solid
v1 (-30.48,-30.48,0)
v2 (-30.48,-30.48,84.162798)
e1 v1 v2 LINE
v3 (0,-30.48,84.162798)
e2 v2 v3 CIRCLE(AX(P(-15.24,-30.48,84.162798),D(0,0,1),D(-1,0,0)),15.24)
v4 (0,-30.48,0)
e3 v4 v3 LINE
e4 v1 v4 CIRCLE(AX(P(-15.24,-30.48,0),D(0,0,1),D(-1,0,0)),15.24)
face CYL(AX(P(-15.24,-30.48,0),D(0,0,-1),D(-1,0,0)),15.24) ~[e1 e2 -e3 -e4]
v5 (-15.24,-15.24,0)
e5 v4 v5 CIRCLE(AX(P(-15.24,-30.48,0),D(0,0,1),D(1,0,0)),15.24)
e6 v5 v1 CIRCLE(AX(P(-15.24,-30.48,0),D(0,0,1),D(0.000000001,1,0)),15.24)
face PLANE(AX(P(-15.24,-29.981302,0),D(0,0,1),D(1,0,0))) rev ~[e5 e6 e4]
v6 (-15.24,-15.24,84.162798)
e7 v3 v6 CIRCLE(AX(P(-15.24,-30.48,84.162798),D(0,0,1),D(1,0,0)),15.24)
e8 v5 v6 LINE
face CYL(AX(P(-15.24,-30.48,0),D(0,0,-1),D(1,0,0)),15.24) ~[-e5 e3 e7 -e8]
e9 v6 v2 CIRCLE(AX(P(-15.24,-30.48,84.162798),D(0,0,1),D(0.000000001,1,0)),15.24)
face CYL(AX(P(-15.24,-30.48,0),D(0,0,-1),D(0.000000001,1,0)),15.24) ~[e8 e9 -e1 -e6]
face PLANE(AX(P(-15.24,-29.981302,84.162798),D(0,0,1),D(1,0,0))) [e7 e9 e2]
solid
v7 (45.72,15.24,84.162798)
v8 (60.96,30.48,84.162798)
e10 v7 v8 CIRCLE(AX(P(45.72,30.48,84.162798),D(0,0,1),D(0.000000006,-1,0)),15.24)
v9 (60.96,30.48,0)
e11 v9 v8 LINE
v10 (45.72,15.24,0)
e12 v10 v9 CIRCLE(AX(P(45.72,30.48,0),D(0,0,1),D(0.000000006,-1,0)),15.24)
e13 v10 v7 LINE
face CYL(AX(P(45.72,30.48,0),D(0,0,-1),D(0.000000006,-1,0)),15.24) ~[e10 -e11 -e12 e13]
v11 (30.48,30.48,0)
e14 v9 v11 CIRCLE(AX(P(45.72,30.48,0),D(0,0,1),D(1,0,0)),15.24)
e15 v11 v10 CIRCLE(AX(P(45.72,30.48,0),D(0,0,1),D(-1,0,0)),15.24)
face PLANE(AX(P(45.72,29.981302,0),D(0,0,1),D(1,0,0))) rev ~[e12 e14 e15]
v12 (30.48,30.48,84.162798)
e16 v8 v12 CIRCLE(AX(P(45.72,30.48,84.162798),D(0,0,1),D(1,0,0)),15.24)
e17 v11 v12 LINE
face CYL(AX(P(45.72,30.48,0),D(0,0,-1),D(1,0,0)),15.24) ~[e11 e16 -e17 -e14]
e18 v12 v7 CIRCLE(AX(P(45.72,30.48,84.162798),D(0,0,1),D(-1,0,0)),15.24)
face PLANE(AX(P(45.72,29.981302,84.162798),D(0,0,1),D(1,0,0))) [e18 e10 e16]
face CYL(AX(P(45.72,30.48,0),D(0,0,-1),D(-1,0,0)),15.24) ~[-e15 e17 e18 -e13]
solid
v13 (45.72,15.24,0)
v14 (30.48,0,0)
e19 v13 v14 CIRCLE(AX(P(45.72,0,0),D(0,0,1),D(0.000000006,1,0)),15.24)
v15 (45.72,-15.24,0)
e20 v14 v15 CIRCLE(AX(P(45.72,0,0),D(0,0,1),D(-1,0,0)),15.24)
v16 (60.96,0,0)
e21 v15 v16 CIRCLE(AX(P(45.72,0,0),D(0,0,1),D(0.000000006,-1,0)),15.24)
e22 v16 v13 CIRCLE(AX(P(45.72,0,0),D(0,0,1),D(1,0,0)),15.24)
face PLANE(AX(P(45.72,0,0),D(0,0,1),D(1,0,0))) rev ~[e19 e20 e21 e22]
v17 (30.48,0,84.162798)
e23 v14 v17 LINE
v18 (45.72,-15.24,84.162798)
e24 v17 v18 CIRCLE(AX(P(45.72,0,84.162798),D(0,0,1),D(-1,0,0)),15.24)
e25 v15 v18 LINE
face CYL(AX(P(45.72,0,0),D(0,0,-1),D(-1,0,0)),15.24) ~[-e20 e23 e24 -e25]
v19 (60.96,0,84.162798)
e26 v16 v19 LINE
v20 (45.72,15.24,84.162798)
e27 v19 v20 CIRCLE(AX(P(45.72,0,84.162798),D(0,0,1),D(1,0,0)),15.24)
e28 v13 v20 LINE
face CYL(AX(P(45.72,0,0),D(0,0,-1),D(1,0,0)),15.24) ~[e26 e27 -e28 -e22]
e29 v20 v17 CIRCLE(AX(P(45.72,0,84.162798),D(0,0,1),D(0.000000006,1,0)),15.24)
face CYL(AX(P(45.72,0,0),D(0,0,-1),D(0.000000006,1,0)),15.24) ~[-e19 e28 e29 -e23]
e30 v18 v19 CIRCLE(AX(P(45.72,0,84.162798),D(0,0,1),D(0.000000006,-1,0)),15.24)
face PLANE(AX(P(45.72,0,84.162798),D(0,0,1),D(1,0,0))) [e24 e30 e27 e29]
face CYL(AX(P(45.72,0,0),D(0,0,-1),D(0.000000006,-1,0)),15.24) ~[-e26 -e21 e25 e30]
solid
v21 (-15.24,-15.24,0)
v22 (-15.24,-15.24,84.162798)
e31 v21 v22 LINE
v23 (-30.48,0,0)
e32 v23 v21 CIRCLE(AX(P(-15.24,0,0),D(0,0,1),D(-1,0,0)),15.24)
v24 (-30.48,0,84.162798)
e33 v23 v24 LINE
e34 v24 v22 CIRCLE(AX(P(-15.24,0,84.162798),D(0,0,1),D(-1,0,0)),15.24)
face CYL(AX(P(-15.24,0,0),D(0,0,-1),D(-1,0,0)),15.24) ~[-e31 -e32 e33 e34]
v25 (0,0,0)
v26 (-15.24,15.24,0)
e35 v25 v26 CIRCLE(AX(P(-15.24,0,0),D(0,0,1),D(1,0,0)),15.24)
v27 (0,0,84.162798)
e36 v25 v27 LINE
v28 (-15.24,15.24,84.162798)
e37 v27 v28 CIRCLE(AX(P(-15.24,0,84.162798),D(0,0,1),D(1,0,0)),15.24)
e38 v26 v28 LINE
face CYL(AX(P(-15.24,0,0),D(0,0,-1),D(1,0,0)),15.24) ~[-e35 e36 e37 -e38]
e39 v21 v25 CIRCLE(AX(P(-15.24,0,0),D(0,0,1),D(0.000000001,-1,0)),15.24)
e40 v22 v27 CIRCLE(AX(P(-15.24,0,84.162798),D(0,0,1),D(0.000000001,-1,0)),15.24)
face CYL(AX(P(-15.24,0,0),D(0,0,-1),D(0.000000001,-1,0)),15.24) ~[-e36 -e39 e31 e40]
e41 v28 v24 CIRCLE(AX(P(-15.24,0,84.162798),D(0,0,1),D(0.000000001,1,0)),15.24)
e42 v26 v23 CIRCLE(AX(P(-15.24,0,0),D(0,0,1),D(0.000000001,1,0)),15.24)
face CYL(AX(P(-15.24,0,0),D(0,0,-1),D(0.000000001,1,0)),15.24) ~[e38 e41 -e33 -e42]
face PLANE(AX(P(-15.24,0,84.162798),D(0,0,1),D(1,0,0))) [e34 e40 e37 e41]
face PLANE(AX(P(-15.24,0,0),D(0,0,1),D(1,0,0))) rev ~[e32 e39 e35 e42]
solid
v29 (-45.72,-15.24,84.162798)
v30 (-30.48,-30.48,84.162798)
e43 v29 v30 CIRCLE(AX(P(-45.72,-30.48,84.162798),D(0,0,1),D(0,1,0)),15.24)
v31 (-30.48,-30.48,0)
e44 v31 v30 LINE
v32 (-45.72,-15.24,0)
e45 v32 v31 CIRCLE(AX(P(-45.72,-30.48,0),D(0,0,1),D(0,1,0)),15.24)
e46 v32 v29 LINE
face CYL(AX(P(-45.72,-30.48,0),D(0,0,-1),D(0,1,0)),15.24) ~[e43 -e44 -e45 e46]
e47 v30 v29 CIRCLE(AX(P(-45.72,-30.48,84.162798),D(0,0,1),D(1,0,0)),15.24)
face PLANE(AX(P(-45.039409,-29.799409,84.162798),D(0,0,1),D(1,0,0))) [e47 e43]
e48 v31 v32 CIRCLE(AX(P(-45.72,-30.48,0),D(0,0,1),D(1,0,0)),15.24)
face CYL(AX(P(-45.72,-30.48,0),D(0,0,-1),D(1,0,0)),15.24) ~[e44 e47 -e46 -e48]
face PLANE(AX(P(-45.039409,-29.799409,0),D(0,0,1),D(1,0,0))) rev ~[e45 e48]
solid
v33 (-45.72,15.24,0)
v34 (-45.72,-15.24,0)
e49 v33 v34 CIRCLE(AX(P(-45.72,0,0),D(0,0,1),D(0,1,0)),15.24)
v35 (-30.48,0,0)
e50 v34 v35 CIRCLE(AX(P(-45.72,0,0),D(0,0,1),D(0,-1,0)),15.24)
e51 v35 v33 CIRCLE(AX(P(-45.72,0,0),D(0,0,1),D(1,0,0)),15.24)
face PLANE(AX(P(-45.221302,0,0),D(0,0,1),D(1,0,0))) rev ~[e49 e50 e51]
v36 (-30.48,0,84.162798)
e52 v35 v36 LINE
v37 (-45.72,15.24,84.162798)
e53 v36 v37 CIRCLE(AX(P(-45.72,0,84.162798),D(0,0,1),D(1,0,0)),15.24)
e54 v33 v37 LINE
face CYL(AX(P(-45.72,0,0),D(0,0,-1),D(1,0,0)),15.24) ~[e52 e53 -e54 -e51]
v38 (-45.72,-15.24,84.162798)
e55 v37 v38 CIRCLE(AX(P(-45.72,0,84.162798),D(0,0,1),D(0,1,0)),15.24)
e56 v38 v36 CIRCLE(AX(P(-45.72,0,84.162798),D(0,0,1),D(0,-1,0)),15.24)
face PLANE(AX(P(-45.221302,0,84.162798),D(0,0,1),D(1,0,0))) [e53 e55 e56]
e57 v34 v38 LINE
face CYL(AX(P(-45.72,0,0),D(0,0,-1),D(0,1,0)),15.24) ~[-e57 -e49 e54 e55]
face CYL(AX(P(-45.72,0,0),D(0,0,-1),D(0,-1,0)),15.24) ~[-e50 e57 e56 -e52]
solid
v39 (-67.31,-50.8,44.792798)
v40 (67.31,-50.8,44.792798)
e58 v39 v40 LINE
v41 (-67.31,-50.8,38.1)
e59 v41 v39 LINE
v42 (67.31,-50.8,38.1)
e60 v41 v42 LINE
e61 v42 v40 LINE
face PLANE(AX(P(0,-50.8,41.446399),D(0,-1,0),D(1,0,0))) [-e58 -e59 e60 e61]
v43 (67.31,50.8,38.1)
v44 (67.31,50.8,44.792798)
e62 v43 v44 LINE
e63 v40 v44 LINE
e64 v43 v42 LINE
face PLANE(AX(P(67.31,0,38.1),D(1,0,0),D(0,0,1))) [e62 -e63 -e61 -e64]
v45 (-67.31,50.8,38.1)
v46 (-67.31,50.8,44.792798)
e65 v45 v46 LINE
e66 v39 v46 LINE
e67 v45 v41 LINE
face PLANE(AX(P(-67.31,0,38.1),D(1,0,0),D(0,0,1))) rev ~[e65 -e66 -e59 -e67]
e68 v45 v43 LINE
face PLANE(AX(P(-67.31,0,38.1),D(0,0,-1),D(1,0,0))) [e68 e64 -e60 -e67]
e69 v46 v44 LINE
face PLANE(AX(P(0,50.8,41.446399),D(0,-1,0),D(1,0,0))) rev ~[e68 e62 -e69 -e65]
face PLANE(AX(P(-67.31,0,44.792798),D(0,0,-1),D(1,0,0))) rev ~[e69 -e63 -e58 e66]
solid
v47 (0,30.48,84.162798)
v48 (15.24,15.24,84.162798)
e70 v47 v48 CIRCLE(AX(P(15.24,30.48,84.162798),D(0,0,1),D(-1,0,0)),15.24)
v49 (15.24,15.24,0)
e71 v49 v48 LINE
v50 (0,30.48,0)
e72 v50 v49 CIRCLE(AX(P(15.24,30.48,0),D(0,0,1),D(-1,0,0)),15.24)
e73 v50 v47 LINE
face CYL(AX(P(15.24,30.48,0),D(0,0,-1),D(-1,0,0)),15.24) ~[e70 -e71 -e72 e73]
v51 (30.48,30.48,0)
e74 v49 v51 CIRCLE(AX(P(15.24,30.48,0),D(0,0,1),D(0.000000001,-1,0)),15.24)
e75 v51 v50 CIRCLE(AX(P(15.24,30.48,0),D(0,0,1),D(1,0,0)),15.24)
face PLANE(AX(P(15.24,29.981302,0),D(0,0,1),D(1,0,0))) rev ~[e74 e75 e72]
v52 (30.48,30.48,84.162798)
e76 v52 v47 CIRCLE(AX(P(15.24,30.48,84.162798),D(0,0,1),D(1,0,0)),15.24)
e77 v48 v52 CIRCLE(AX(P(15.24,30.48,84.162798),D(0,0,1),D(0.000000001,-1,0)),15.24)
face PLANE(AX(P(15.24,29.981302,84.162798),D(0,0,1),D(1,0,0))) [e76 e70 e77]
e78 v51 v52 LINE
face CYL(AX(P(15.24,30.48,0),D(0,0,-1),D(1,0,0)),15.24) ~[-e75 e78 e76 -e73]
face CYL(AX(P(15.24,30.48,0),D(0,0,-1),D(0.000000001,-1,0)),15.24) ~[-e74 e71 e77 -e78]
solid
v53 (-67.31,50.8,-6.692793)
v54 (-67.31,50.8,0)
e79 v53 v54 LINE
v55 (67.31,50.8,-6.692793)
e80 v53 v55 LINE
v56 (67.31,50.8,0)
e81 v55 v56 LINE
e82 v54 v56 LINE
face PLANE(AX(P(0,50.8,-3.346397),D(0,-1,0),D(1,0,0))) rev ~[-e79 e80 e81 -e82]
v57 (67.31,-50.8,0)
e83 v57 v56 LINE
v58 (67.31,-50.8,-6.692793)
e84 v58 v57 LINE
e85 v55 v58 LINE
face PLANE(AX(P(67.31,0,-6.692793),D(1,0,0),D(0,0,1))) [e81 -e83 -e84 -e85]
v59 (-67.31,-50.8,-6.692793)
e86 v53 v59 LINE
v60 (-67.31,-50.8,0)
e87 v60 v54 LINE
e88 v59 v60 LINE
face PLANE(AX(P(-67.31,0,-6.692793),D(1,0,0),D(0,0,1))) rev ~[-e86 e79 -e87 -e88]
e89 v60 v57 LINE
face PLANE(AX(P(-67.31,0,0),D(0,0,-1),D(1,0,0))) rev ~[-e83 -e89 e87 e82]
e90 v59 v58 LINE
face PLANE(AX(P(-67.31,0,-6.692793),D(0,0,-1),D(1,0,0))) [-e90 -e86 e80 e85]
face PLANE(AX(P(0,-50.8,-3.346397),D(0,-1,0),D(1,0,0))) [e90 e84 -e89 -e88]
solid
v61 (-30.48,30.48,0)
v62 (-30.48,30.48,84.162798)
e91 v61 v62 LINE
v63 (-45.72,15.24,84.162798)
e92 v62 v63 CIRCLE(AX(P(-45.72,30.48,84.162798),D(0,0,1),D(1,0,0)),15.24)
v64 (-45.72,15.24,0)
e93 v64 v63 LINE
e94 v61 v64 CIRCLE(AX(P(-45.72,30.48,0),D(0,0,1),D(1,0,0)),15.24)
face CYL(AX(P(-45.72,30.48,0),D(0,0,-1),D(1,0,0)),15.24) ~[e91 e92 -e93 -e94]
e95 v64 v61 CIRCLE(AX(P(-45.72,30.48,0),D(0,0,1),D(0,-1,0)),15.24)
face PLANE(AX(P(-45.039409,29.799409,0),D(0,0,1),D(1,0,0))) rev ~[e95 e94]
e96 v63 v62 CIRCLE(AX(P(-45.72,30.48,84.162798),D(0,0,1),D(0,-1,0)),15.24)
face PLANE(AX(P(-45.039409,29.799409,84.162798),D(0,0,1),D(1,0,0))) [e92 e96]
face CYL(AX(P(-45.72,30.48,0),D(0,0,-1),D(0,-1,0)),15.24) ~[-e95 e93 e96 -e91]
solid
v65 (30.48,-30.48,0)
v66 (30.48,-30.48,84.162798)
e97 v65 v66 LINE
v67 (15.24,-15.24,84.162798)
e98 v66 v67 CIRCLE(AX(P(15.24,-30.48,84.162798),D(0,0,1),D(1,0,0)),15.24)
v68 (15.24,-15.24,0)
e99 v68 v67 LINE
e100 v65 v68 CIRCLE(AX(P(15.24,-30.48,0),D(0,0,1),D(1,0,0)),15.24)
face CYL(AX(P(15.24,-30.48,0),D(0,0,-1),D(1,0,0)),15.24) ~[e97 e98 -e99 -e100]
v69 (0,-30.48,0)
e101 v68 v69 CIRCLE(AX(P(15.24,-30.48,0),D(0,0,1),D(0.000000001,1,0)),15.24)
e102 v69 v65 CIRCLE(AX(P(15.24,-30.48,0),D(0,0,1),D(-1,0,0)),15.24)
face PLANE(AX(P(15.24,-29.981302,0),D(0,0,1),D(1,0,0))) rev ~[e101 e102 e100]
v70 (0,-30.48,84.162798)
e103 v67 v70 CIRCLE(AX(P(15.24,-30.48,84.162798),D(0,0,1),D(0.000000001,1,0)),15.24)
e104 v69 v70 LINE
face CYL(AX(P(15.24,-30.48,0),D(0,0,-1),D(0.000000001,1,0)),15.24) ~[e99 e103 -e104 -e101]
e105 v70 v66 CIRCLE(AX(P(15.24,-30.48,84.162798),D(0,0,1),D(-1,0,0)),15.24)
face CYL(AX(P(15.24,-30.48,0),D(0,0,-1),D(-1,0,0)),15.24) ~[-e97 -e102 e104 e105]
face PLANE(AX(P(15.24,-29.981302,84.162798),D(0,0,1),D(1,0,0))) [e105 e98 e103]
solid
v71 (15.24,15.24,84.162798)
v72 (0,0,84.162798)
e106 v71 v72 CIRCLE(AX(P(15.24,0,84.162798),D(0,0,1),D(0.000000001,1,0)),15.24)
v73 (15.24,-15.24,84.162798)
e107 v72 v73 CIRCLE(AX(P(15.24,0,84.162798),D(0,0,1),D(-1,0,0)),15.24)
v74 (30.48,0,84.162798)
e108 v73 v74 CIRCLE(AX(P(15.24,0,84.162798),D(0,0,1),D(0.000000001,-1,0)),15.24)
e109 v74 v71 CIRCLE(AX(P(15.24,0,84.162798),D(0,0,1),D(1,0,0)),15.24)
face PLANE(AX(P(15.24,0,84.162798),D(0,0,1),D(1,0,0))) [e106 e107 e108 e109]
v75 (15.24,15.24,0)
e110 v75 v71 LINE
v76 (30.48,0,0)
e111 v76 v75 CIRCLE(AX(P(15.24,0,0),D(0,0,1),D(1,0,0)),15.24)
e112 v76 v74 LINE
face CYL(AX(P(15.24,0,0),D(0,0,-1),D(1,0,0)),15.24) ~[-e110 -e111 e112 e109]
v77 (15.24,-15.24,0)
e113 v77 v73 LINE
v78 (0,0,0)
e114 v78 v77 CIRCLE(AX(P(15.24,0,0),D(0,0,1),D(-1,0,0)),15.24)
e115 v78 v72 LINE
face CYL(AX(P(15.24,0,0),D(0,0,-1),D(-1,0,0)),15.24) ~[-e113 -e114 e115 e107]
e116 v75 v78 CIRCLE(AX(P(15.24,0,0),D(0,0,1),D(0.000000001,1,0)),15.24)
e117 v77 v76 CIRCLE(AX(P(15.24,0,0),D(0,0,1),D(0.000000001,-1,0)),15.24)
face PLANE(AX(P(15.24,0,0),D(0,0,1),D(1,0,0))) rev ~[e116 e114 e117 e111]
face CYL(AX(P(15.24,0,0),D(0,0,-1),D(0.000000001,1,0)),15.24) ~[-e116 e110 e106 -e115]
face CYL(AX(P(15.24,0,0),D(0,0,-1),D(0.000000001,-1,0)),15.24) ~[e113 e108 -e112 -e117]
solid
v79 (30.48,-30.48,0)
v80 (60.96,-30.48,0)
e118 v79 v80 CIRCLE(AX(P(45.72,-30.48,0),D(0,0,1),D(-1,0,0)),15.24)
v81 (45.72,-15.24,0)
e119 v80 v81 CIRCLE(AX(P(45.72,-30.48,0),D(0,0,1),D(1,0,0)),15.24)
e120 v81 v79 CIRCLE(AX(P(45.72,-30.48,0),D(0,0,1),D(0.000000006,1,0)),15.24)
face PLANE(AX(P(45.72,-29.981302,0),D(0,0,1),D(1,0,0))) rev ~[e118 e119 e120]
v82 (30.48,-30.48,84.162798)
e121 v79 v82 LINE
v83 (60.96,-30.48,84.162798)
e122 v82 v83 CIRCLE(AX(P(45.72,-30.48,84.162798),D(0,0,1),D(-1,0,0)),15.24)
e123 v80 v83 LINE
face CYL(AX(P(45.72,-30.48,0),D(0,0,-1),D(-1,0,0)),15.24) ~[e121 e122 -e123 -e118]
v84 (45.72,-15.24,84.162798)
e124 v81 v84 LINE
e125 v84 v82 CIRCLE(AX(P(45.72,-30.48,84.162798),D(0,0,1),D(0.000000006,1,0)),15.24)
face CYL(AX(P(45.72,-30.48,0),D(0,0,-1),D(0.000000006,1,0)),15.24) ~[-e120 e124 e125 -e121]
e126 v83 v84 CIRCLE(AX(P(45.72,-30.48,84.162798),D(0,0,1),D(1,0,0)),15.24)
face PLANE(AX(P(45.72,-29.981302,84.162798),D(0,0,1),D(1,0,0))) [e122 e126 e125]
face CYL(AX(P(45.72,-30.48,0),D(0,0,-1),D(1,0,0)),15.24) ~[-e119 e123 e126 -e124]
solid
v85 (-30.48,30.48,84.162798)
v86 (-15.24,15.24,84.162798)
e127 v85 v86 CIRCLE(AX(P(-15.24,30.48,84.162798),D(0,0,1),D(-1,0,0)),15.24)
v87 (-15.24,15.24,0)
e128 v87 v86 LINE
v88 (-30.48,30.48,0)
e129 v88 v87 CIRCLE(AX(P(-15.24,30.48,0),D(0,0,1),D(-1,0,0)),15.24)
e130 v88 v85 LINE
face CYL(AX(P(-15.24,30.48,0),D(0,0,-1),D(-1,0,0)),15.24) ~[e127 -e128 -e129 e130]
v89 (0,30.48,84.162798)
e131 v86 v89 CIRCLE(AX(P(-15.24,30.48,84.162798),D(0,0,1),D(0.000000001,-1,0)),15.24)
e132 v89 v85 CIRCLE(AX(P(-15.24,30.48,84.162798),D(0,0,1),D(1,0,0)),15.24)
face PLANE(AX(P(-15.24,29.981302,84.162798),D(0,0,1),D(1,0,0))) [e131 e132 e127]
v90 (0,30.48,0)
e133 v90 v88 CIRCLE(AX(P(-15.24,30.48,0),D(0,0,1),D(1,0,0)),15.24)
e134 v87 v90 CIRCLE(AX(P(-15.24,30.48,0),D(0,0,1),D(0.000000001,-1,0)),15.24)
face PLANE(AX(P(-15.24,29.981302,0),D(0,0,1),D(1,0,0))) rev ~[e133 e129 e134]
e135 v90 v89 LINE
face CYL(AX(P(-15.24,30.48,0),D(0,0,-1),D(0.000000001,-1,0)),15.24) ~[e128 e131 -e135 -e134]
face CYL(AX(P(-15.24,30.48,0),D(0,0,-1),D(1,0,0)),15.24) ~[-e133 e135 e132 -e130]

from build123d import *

# Parameters (mm, degrees)
F1_DEPTH = 84.1627984
F2_W     = 134.62
F2_H     = 6.6927933697
F3_DEPTH = 50.8
F2_H_2   = 6.6927984


# Not quite as in the source:
# - a feature names something its author has since deleted; it is built from what else it names


with BuildPart() as f1:
    # F0 (on Top) → F1 (new body)
    with BuildSketch(Plane.XY):
        with BuildLine():
            ThreePointArc((-45.72, -15.24), (-56.4963073453, -41.2563073453), (-30.48, -30.48))
            ThreePointArc((-30.48, -30.48), (-34.9436926547, -19.7036926547), (-45.72, -15.24))
        make_face()
    extrude(amount=F1_DEPTH)


with BuildPart() as f1b:
    # F0 (on Top) → F1, piece 2 (new body)
    with BuildSketch(Plane.XY):
        with BuildLine():
            ThreePointArc((-15.2399999801, -15.24), (-26.0163073382, -19.7036926477), (-30.48, -30.48))
            ThreePointArc((-30.48, -30.48), (-15.24, -45.72), (0, -30.48))
            ThreePointArc((0, -30.48), (-4.4636926477, -19.7036926618), (-15.2399999801, -15.24))
        make_face()
    extrude(amount=F1_DEPTH)


with BuildPart() as f1c:
    # F0 (on Top) → F1, piece 3 (new body)
    with BuildSketch(Plane.XY):
        with BuildLine():
            ThreePointArc((-45.72, 15.24), (-60.96, 0), (-45.72, -15.24))
            ThreePointArc((-45.72, -15.24), (-34.9436926547, -10.7763073453), (-30.48, 0))
            ThreePointArc((-30.48, 0), (-34.9436926547, 10.7763073453), (-45.72, 15.24))
        make_face()
    extrude(amount=F1_DEPTH)


with BuildPart() as f1d:
    # F0 (on Top) → F1, piece 4 (new body)
    with BuildSketch(Plane.XY):
        with BuildLine():
            ThreePointArc((15.2400000199, -15.24), (4.4636926618, -19.7036926477), (0, -30.48))
            ThreePointArc((0, -30.48), (15.24, -45.72), (30.48, -30.48))
            ThreePointArc((30.48, -30.48), (26.0163073523, -19.7036926618), (15.2400000199, -15.24))
        make_face()
    extrude(amount=F1_DEPTH)


with BuildPart() as f1e:
    # F0 (on Top) → F1, piece 5 (new body)
    with BuildSketch(Plane.XY):
        with BuildLine():
            ThreePointArc((-30.48, 0), (-26.0163073382, -10.7763073523), (-15.2399999801, -15.24))
            ThreePointArc((-15.2399999801, -15.24), (-4.4636926477, -10.7763073382), (0, 0))
            ThreePointArc((0, 0), (-4.4636926477, 10.7763073382), (-15.2399999801, 15.24))
            ThreePointArc((-15.2399999801, 15.24), (-26.0163073382, 10.7763073523), (-30.48, 0))
        make_face()
    extrude(amount=F1_DEPTH)


with BuildPart() as f1f:
    # F0 (on Top) → F1, piece 6 (new body)
    with BuildSketch(Plane.XY):
        with BuildLine():
            ThreePointArc((-30.48, 30.48), (-56.4963073453, 41.2563073453), (-45.72, 15.24))
            ThreePointArc((-45.72, 15.24), (-34.9436926547, 19.7036926547), (-30.48, 30.48))
        make_face()
    extrude(amount=F1_DEPTH)


with BuildPart() as f1g:
    # F0 (on Top) → F1, piece 7 (new body)
    with BuildSketch(Plane.XY):
        with BuildLine():
            ThreePointArc((45.7200000919, -15.24), (34.9436926872, -19.7036926222), (30.48, -30.48))
            ThreePointArc((30.48, -30.48), (45.72, -45.72), (60.96, -30.48))
            ThreePointArc((60.96, -30.48), (56.4963073778, -19.7036926872), (45.7200000919, -15.24))
        make_face()
    extrude(amount=F1_DEPTH)


with BuildPart() as f1h:
    # F0 (on Top) → F1, piece 8 (new body)
    with BuildSketch(Plane.XY):
        with BuildLine():
            ThreePointArc((0, 0), (4.4636926618, -10.7763073523), (15.2400000199, -15.24))
            ThreePointArc((15.2400000199, -15.24), (26.0163073523, -10.7763073382), (30.48, 0))
            ThreePointArc((30.48, 0), (26.0163073523, 10.7763073382), (15.2400000199, 15.24))
            ThreePointArc((15.2400000199, 15.24), (4.4636926618, 10.7763073523), (0, 0))
        make_face()
    extrude(amount=F1_DEPTH)


with BuildPart() as f1i:
    # F0 (on Top) → F1, piece 9 (new body)
    with BuildSketch(Plane.XY):
        with BuildLine():
            ThreePointArc((0, 30.48), (-15.24, 45.72), (-30.48, 30.48))
            ThreePointArc((-30.48, 30.48), (-26.0163073382, 19.7036926477), (-15.2399999801, 15.24))
            ThreePointArc((-15.2399999801, 15.24), (-4.4636926477, 19.7036926618), (0, 30.48))
        make_face()
    extrude(amount=F1_DEPTH)


with BuildPart() as f1j:
    # F0 (on Top) → F1, piece 10 (new body)
    with BuildSketch(Plane.XY):
        with BuildLine():
            ThreePointArc((30.48, 0), (34.9436926872, -10.7763073778), (45.7200000919, -15.24))
            ThreePointArc((45.7200000919, -15.24), (56.4963073778, -10.7763073128), (60.96, 0))
            ThreePointArc((60.96, 0), (56.4963073778, 10.7763073128), (45.7200000919, 15.24))
            ThreePointArc((45.7200000919, 15.24), (34.9436926872, 10.7763073778), (30.48, 0))
        make_face()
    extrude(amount=F1_DEPTH)


with BuildPart() as f1k:
    # F0 (on Top) → F1, piece 11 (new body)
    with BuildSketch(Plane.XY):
        with BuildLine():
            ThreePointArc((0, 30.48), (4.4636926618, 19.7036926477), (15.2400000199, 15.24))
            ThreePointArc((15.2400000199, 15.24), (26.0163073523, 19.7036926618), (30.48, 30.48))
            ThreePointArc((30.48, 30.48), (15.24, 45.72), (0, 30.48))
        make_face()
    extrude(amount=F1_DEPTH)


with BuildPart() as f1l:
    # F0 (on Top) → F1, piece 12 (new body)
    with BuildSketch(Plane.XY):
        with BuildLine():
            ThreePointArc((30.48, 30.48), (34.9436926872, 19.7036926222), (45.7200000919, 15.24))
            ThreePointArc((45.7200000919, 15.24), (56.4963073778, 19.7036926872), (60.96, 30.48))
            ThreePointArc((60.96, 30.48), (45.72, 45.72), (30.48, 30.48))
        make_face()
    extrude(amount=F1_DEPTH)


with BuildPart() as f3:
    # F2 (on Front) → F3 (new body, symmetric)
    with BuildSketch(Plane.XZ):
        with Locations((0, -3.3463966849)):
            Rectangle(F2_W, F2_H)
    extrude(amount=F3_DEPTH, both=True)


with BuildPart() as f3b:
    # F2 (on Front) → F3, piece 2 (new body, symmetric)
    with BuildSketch(Plane.XZ):
        with Locations((0, 41.4463992)):
            Rectangle(F2_W, F2_H_2)
    extrude(amount=F3_DEPTH, both=True)


solid = Compound([f1.part, f1b.part, f1c.part, f1d.part, f1e.part, f1f.part, f1g.part, f1h.part, f1i.part, f1j.part, f1k.part, f1l.part, f3.part, f3b.part])
